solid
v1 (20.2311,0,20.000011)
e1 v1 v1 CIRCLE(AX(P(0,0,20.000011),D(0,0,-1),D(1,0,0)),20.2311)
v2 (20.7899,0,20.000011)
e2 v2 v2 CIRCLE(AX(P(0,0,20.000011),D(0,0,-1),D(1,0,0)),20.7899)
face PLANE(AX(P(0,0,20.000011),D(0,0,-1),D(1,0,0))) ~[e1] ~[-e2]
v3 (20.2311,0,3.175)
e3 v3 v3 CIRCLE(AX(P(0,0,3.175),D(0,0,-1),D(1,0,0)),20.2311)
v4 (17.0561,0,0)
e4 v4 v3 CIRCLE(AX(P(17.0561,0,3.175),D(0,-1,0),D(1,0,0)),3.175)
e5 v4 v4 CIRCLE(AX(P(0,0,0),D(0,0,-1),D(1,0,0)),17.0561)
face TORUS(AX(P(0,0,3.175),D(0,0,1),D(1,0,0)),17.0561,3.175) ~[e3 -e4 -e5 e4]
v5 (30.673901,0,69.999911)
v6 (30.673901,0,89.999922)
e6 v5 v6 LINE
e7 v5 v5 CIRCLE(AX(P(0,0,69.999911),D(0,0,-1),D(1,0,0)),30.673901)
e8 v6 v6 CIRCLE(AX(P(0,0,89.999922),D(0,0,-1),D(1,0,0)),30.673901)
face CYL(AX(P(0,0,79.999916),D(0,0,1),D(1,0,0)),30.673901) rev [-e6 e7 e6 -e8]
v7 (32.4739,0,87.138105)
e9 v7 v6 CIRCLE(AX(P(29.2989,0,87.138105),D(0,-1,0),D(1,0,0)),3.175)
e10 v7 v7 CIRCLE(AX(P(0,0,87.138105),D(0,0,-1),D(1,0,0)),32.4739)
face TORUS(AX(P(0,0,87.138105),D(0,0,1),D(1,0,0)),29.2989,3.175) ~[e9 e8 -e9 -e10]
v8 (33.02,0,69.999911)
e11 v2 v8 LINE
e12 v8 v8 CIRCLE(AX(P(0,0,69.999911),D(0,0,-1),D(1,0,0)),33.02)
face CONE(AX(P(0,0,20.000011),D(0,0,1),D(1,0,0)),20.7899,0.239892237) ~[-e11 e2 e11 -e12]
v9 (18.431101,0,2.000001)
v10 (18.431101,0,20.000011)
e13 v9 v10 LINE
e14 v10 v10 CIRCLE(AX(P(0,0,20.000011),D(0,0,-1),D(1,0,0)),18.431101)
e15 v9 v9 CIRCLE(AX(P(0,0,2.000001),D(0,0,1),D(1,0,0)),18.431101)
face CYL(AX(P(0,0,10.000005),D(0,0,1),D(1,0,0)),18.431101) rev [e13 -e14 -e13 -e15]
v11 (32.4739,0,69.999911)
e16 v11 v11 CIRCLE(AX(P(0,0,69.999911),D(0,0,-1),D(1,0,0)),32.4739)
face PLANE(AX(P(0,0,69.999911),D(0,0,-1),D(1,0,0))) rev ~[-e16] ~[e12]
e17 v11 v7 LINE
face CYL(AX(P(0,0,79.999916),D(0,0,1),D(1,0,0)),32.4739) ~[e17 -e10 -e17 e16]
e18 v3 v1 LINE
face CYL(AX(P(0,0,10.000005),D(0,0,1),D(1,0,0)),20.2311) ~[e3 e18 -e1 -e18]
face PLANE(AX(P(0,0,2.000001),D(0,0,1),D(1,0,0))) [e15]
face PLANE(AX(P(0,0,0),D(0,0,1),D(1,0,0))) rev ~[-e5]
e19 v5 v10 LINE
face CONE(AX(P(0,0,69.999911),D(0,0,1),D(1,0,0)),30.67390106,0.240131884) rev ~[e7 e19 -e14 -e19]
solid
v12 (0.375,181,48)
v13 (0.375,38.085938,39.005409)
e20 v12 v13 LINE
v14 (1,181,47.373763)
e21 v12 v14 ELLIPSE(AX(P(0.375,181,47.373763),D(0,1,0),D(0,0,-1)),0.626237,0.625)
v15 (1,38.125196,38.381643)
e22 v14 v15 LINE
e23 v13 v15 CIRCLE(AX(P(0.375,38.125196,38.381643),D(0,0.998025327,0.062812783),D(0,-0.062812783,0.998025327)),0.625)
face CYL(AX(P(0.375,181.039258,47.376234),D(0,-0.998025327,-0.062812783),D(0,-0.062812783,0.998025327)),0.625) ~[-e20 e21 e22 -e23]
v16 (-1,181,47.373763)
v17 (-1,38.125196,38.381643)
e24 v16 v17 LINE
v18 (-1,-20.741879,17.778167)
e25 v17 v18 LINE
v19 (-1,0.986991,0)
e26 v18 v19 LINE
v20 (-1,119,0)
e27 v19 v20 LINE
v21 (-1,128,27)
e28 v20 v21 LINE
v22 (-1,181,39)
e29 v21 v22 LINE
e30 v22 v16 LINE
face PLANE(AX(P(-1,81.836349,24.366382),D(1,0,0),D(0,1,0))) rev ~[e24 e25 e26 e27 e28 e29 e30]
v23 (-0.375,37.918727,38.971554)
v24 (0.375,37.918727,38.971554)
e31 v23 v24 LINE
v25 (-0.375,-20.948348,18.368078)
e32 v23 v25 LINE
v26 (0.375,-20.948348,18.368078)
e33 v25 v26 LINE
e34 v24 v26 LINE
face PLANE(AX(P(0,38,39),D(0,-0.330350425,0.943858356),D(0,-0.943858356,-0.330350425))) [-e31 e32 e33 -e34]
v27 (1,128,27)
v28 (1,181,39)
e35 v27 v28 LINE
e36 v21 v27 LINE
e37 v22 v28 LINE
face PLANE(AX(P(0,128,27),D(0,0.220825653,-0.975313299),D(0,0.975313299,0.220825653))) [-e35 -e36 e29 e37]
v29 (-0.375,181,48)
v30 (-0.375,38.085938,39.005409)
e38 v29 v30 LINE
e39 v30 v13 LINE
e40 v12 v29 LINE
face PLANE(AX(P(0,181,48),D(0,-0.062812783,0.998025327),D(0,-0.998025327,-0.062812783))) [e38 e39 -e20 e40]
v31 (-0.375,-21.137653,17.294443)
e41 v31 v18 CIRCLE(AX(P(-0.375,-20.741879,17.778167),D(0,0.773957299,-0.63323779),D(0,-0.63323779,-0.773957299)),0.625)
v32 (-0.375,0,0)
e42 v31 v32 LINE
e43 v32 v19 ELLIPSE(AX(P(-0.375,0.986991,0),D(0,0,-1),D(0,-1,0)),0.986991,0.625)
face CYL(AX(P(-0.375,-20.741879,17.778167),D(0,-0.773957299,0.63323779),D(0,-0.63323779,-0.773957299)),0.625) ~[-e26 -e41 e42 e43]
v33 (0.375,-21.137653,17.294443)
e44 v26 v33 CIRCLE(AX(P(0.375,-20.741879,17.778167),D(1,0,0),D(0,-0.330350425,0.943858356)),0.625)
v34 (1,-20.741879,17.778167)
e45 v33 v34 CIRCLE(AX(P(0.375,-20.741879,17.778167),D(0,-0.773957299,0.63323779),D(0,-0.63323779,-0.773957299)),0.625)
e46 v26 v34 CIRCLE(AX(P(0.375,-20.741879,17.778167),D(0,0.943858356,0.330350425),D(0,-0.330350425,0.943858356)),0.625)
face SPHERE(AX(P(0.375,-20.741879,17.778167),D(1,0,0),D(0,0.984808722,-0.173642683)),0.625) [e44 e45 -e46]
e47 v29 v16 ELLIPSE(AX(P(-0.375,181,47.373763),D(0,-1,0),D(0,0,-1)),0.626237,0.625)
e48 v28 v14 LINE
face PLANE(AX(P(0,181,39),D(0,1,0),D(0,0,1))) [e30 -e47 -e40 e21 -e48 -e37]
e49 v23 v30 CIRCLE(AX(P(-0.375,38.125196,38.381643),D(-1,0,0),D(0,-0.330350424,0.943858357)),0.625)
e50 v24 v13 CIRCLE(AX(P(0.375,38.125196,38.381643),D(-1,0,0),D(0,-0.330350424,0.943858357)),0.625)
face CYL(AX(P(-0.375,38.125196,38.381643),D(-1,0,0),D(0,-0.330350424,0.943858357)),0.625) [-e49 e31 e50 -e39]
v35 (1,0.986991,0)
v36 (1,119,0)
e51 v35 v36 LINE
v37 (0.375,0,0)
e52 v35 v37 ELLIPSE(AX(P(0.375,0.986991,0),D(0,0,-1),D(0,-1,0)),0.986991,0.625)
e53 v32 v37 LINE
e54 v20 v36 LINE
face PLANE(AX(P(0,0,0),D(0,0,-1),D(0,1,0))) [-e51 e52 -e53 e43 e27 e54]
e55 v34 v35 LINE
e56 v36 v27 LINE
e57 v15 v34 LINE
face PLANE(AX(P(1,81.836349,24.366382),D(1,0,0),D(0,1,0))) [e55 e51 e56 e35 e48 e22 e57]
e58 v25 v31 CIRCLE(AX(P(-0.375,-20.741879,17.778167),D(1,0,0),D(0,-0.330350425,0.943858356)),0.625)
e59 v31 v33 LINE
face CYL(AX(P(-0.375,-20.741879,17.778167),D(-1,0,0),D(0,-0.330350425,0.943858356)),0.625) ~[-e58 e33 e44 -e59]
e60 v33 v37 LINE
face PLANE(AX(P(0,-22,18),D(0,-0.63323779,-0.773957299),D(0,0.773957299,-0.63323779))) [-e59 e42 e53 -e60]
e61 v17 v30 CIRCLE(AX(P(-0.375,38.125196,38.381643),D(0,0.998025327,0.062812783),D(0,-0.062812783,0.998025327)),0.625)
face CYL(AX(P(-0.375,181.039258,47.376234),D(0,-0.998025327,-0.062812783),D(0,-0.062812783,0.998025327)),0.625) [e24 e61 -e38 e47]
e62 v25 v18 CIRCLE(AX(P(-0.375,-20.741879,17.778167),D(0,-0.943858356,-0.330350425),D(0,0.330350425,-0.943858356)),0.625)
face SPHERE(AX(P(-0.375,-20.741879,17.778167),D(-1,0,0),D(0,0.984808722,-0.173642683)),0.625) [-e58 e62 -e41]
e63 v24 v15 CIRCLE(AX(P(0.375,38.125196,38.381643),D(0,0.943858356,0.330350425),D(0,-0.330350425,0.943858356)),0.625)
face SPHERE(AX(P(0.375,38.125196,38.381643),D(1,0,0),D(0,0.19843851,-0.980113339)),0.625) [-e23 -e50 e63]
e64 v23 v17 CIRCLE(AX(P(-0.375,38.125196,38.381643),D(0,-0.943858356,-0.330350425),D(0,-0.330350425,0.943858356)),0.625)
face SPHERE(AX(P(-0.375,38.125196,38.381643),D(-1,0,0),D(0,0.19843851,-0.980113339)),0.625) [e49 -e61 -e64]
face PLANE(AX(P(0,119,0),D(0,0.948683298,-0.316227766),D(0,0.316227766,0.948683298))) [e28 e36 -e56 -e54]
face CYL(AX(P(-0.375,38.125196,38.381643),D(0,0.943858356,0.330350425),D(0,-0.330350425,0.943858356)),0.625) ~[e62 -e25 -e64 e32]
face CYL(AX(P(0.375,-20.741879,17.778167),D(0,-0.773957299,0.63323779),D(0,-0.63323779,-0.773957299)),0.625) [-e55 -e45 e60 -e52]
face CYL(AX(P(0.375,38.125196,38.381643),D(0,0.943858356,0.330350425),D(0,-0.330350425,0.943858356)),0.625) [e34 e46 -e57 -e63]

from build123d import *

# Parameters (mm, degrees)
F1_DEPTH     = 1
F2_R         = 0.625
F3_T1_DEPTH  = 65.0452526587
F3_T3_DEPTH  = 0.75
F3_T8_DEPTH  = 0.625
F3_T14_DEPTH = 0.625
F4_T1_DEPTH  = 28.8736358303
F4_T3_DEPTH  = 0.75
F4_T8_DEPTH  = 0.625
F4_T14_DEPTH = 0.625
F5_W         = 1.79999894
F5_H         = 20.0000108
F7_R         = 18.43110106
F8_DEPTH     = 2.00000108
F9_R         = 3.175


# Not quite as in the source:
# - a fillet or chamfer that OpenCascade refuses, or shapes differently, is made with other operations: its cross-section is extruded or revolved along the edge and cut away or added
# - a feature names something its author has since deleted; it is built from what else it names


with BuildPart() as f1:
    # F0 (on Right) → F1 (new body, symmetric)
    with BuildSketch(Plane.YZ):
        Polygon((-22, 18), (0, 0), (119, 0), (128, 27), (181, 39), (181, 48), (38, 39), align=None)
    extrude(amount=F1_DEPTH, both=True)

    # F2
    f2_edges = [f1.edges().sort_by_distance(p)[0] for p in [
        (1, 109.5, 43.5),
        (-1, 109.5, 43.5),
    ]]
    fillet(f2_edges, radius=F2_R)

    # F3: fillet of radius 0.625 on 2 edges, made by hand

    # F3_s2 → F3_t1 (cut)
    with BuildSketch(Plane(origin=(0, 45.932089611, 16.0762313638), x_dir=(1, 0, 0), z_dir=(0, -0.9438583564, -0.3303504247))):
        with BuildLine():
            ThreePointArc((-0.375, 24.2571597586), (-0.8169417382, 24.0741014968), (-1, 23.6321597586))
            Line((-1, 23.6321597586), (-1, 24.2571597586))
            Line((-1, 24.2571597586), (-0.375, 24.2571597586))
        make_face()
        with BuildLine():
            ThreePointArc((0.375, 24.2571597586), (0.8169417382, 24.0741014968), (1, 23.6321597586))
            Line((1, 23.6321597586), (1, 24.2571597586))
            Line((1, 24.2571597586), (0.375, 24.2571597586))
        make_face()
    extrude(amount=F3_T1_DEPTH, mode=Mode.SUBTRACT)

    # F3_s4 → F3_t3 (cut)
    with BuildSketch(Plane.YZ.offset(-0.375)):
        with BuildLine():
            ThreePointArc((37.918726582, 38.9715543037), (38.0011715289, 38.994213668), (38.0859376082, 39.0054086607))
            Line((38.0859376082, 39.0054086607), (38, 39))
            Line((38, 39), (37.918726582, 38.9715543037))
        make_face()
    extrude(amount=F3_T3_DEPTH, mode=Mode.SUBTRACT)


with BuildPart() as f3_tool6:
    # F3_s7 → F3_t8 (new body)
    with BuildSketch(Plane.YZ.offset(0.375)):
        Polygon((38.1251955975, 38.381642831), (37.918726582, 38.9715543037), (38, 39), (38.0859376082, 39.0054086607), align=None)
    extrude(amount=F3_T8_DEPTH)

    # F3_s9 → F3_t10 (revolve, cut)
    with BuildSketch(Plane(origin=(0.375, 38.1251955975, 38.381642831), x_dir=(0, 0.1984385097, -0.9801133393), z_dir=(0, -0.9801133393, -0.1984385097))):
        with BuildLine():
            ThreePointArc((0, -0.625), (0.625, 0), (0, 0.625))
            Line((0, 0.625), (0, -0.625))
        make_face()
    revolve(axis=Axis((0.375, 38.1251955975, 38.381642831), (1, 0, 0)), mode=Mode.SUBTRACT)


with BuildPart() as f1_1:
    add(f1.part)

    # F3_t5: cut F3_tool6
    add(f3_tool6.part, mode=Mode.SUBTRACT)


with BuildPart() as f3_tool12:
    # F3_s13 → F3_t14 (new body)
    with BuildSketch(Plane.YZ.offset(-0.375)):
        Polygon((38.1251955975, 38.381642831), (38.0859376082, 39.0054086607), (38, 39), (37.918726582, 38.9715543037), align=None)
    extrude(amount=-F3_T14_DEPTH)

    # F3_s15 → F3_t16 (revolve, cut)
    with BuildSketch(Plane(origin=(-0.375, 38.1251955975, 38.381642831), x_dir=(0, 0.1984385097, -0.9801133393), z_dir=(0, 0.9801133393, 0.1984385097))):
        with BuildLine():
            ThreePointArc((0, -0.625), (0.625, 0), (0, 0.625))
            Line((0, 0.625), (0, -0.625))
        make_face()
    revolve(axis=Axis((-0.375, 38.1251955975, 38.381642831), (-1, 0, 0)), mode=Mode.SUBTRACT)


with BuildPart() as f1_2:
    add(f1_1.part)

    # F3_t11: cut F3_tool12
    add(f3_tool12.part, mode=Mode.SUBTRACT)

    # F4: fillet of radius 0.625 on 3 edges, made by hand

    # F4_s2 → F4_t1 (cut)
    with BuildSketch(Plane(origin=(0, -21.1376529254, 17.2944433026), x_dir=(1, 0, 0), z_dir=(0, 0.7739572992, -0.6332377903))):
        with BuildLine():
            ThreePointArc((0.375, 0), (0.8169417382, -0.1830582618), (1, -0.625))
            Line((1, -0.625), (1, 0))
            Line((1, 0), (0.375, 0))
        make_face()
        with BuildLine():
            ThreePointArc((-0.375, 0), (-0.8169417382, -0.1830582618), (-1, -0.625))
            Line((-1, -0.625), (-1, 0))
            Line((-1, 0), (-0.375, 0))
        make_face()
    extrude(amount=F4_T1_DEPTH, mode=Mode.SUBTRACT)

    # F4_s4 → F4_t3 (cut)
    with BuildSketch(Plane.YZ.offset(-0.375)):
        with BuildLine():
            ThreePointArc((-20.9483483219, 18.3680780873), (-21.3573847576, 17.8866932915), (-21.1376529254, 17.2944433026))
            Line((-21.1376529254, 17.2944433026), (-22, 18))
            Line((-22, 18), (-20.9483483219, 18.3680780873))
        make_face()
    extrude(amount=F4_T3_DEPTH, mode=Mode.SUBTRACT)


with BuildPart() as f4_tool6:
    # F4_s7 → F4_t8 (new body)
    with BuildSketch(Plane.YZ.offset(0.375)):
        Polygon((-20.7418793065, 17.7781666146), (-21.1376529254, 17.2944433026), (-22, 18), (-20.9483483219, 18.3680780873), align=None)
    extrude(amount=F4_T8_DEPTH)

    # F4_s9 → F4_t10 (revolve, cut)
    with BuildSketch(Plane(origin=(0.375, -20.7418793065, 17.7781666146), x_dir=(0, 0.9848087219, -0.173642683), z_dir=(0, -0.173642683, -0.9848087219))):
        with BuildLine():
            ThreePointArc((0, -0.625), (0.625, 0), (0, 0.625))
            Line((0, 0.625), (0, -0.625))
        make_face()
    revolve(axis=Axis((0.375, -20.7418793065, 17.7781666146), (1, 0, 0)), mode=Mode.SUBTRACT)


with BuildPart() as f1_3:
    add(f1_2.part)

    # F4_t5: cut F4_tool6
    add(f4_tool6.part, mode=Mode.SUBTRACT)


with BuildPart() as f4_tool12:
    # F4_s13 → F4_t14 (new body)
    with BuildSketch(Plane.YZ.offset(-0.375)):
        Polygon((-20.7418793065, 17.7781666146), (-21.1376529254, 17.2944433026), (-22, 18), (-20.9483483219, 18.3680780873), align=None)
    extrude(amount=-F4_T14_DEPTH)

    # F4_s15 → F4_t16 (revolve, cut)
    with BuildSketch(Plane(origin=(-0.375, -20.7418793065, 17.7781666146), x_dir=(0, 0.9848087219, -0.173642683), z_dir=(0, 0.173642683, 0.9848087219))):
        with BuildLine():
            ThreePointArc((0, -0.625), (0.625, 0), (0, 0.625))
            Line((0, 0.625), (0, -0.625))
        make_face()
    revolve(axis=Axis((-0.375, -20.7418793065, 17.7781666146), (-1, 0, 0)), mode=Mode.SUBTRACT)


with BuildPart() as f1_4:
    add(f1_3.part)

    # F4_t11: cut F4_tool12
    add(f4_tool12.part, mode=Mode.SUBTRACT)


with BuildPart() as f6:
    # F5 (on Front) → F6 (revolve)
    with BuildSketch(Plane.XZ):
        Polygon((32.4739, 69.9999108), (30.67390106, 69.9999108), (18.43110106, 20.0000108), (20.2311, 20.0000108), (20.7899, 20.0000108), (33.02, 69.9999108), align=None)
        with Locations((19.33110053, 10.0000054)):
            Rectangle(F5_W, F5_H)
        with Locations((31.57390053, 79.9999162)):
            Rectangle(F5_W, F5_H)
    revolve(axis=Axis((0, 0, -0.9119894143), (0, 0, -1)))

    # F7 (on Top) → F8 (join)
    with BuildSketch(Plane.XY):
        Circle(F7_R)
    extrude(amount=F8_DEPTH)

    # F9
    f9_edges = [f6.edges().sort_by_distance(p)[0] for p in [
        (-20.2311, 0, 0),
    ]]
    fillet(f9_edges, radius=F9_R)

    # F10: fillet of radius 3.175 on 1 edges, made by hand

    # F10_s1 → F10_t2 (revolve, cut)
    with BuildSketch(Plane.XZ):
        with BuildLine():
            ThreePointArc((32.4739, 87.138104505), (31.9864875209, 88.8285181577), (30.67390106, 89.9999216))
            Line((30.67390106, 89.9999216), (32.4739, 89.9999216))
            Line((32.4739, 89.9999216), (32.4739, 87.138104505))
        make_face()
    revolve(axis=Axis((0, 0, 89.9999216), (0, 0, -1)), mode=Mode.SUBTRACT)


solid = Compound([f1_4.part, f6.part])
